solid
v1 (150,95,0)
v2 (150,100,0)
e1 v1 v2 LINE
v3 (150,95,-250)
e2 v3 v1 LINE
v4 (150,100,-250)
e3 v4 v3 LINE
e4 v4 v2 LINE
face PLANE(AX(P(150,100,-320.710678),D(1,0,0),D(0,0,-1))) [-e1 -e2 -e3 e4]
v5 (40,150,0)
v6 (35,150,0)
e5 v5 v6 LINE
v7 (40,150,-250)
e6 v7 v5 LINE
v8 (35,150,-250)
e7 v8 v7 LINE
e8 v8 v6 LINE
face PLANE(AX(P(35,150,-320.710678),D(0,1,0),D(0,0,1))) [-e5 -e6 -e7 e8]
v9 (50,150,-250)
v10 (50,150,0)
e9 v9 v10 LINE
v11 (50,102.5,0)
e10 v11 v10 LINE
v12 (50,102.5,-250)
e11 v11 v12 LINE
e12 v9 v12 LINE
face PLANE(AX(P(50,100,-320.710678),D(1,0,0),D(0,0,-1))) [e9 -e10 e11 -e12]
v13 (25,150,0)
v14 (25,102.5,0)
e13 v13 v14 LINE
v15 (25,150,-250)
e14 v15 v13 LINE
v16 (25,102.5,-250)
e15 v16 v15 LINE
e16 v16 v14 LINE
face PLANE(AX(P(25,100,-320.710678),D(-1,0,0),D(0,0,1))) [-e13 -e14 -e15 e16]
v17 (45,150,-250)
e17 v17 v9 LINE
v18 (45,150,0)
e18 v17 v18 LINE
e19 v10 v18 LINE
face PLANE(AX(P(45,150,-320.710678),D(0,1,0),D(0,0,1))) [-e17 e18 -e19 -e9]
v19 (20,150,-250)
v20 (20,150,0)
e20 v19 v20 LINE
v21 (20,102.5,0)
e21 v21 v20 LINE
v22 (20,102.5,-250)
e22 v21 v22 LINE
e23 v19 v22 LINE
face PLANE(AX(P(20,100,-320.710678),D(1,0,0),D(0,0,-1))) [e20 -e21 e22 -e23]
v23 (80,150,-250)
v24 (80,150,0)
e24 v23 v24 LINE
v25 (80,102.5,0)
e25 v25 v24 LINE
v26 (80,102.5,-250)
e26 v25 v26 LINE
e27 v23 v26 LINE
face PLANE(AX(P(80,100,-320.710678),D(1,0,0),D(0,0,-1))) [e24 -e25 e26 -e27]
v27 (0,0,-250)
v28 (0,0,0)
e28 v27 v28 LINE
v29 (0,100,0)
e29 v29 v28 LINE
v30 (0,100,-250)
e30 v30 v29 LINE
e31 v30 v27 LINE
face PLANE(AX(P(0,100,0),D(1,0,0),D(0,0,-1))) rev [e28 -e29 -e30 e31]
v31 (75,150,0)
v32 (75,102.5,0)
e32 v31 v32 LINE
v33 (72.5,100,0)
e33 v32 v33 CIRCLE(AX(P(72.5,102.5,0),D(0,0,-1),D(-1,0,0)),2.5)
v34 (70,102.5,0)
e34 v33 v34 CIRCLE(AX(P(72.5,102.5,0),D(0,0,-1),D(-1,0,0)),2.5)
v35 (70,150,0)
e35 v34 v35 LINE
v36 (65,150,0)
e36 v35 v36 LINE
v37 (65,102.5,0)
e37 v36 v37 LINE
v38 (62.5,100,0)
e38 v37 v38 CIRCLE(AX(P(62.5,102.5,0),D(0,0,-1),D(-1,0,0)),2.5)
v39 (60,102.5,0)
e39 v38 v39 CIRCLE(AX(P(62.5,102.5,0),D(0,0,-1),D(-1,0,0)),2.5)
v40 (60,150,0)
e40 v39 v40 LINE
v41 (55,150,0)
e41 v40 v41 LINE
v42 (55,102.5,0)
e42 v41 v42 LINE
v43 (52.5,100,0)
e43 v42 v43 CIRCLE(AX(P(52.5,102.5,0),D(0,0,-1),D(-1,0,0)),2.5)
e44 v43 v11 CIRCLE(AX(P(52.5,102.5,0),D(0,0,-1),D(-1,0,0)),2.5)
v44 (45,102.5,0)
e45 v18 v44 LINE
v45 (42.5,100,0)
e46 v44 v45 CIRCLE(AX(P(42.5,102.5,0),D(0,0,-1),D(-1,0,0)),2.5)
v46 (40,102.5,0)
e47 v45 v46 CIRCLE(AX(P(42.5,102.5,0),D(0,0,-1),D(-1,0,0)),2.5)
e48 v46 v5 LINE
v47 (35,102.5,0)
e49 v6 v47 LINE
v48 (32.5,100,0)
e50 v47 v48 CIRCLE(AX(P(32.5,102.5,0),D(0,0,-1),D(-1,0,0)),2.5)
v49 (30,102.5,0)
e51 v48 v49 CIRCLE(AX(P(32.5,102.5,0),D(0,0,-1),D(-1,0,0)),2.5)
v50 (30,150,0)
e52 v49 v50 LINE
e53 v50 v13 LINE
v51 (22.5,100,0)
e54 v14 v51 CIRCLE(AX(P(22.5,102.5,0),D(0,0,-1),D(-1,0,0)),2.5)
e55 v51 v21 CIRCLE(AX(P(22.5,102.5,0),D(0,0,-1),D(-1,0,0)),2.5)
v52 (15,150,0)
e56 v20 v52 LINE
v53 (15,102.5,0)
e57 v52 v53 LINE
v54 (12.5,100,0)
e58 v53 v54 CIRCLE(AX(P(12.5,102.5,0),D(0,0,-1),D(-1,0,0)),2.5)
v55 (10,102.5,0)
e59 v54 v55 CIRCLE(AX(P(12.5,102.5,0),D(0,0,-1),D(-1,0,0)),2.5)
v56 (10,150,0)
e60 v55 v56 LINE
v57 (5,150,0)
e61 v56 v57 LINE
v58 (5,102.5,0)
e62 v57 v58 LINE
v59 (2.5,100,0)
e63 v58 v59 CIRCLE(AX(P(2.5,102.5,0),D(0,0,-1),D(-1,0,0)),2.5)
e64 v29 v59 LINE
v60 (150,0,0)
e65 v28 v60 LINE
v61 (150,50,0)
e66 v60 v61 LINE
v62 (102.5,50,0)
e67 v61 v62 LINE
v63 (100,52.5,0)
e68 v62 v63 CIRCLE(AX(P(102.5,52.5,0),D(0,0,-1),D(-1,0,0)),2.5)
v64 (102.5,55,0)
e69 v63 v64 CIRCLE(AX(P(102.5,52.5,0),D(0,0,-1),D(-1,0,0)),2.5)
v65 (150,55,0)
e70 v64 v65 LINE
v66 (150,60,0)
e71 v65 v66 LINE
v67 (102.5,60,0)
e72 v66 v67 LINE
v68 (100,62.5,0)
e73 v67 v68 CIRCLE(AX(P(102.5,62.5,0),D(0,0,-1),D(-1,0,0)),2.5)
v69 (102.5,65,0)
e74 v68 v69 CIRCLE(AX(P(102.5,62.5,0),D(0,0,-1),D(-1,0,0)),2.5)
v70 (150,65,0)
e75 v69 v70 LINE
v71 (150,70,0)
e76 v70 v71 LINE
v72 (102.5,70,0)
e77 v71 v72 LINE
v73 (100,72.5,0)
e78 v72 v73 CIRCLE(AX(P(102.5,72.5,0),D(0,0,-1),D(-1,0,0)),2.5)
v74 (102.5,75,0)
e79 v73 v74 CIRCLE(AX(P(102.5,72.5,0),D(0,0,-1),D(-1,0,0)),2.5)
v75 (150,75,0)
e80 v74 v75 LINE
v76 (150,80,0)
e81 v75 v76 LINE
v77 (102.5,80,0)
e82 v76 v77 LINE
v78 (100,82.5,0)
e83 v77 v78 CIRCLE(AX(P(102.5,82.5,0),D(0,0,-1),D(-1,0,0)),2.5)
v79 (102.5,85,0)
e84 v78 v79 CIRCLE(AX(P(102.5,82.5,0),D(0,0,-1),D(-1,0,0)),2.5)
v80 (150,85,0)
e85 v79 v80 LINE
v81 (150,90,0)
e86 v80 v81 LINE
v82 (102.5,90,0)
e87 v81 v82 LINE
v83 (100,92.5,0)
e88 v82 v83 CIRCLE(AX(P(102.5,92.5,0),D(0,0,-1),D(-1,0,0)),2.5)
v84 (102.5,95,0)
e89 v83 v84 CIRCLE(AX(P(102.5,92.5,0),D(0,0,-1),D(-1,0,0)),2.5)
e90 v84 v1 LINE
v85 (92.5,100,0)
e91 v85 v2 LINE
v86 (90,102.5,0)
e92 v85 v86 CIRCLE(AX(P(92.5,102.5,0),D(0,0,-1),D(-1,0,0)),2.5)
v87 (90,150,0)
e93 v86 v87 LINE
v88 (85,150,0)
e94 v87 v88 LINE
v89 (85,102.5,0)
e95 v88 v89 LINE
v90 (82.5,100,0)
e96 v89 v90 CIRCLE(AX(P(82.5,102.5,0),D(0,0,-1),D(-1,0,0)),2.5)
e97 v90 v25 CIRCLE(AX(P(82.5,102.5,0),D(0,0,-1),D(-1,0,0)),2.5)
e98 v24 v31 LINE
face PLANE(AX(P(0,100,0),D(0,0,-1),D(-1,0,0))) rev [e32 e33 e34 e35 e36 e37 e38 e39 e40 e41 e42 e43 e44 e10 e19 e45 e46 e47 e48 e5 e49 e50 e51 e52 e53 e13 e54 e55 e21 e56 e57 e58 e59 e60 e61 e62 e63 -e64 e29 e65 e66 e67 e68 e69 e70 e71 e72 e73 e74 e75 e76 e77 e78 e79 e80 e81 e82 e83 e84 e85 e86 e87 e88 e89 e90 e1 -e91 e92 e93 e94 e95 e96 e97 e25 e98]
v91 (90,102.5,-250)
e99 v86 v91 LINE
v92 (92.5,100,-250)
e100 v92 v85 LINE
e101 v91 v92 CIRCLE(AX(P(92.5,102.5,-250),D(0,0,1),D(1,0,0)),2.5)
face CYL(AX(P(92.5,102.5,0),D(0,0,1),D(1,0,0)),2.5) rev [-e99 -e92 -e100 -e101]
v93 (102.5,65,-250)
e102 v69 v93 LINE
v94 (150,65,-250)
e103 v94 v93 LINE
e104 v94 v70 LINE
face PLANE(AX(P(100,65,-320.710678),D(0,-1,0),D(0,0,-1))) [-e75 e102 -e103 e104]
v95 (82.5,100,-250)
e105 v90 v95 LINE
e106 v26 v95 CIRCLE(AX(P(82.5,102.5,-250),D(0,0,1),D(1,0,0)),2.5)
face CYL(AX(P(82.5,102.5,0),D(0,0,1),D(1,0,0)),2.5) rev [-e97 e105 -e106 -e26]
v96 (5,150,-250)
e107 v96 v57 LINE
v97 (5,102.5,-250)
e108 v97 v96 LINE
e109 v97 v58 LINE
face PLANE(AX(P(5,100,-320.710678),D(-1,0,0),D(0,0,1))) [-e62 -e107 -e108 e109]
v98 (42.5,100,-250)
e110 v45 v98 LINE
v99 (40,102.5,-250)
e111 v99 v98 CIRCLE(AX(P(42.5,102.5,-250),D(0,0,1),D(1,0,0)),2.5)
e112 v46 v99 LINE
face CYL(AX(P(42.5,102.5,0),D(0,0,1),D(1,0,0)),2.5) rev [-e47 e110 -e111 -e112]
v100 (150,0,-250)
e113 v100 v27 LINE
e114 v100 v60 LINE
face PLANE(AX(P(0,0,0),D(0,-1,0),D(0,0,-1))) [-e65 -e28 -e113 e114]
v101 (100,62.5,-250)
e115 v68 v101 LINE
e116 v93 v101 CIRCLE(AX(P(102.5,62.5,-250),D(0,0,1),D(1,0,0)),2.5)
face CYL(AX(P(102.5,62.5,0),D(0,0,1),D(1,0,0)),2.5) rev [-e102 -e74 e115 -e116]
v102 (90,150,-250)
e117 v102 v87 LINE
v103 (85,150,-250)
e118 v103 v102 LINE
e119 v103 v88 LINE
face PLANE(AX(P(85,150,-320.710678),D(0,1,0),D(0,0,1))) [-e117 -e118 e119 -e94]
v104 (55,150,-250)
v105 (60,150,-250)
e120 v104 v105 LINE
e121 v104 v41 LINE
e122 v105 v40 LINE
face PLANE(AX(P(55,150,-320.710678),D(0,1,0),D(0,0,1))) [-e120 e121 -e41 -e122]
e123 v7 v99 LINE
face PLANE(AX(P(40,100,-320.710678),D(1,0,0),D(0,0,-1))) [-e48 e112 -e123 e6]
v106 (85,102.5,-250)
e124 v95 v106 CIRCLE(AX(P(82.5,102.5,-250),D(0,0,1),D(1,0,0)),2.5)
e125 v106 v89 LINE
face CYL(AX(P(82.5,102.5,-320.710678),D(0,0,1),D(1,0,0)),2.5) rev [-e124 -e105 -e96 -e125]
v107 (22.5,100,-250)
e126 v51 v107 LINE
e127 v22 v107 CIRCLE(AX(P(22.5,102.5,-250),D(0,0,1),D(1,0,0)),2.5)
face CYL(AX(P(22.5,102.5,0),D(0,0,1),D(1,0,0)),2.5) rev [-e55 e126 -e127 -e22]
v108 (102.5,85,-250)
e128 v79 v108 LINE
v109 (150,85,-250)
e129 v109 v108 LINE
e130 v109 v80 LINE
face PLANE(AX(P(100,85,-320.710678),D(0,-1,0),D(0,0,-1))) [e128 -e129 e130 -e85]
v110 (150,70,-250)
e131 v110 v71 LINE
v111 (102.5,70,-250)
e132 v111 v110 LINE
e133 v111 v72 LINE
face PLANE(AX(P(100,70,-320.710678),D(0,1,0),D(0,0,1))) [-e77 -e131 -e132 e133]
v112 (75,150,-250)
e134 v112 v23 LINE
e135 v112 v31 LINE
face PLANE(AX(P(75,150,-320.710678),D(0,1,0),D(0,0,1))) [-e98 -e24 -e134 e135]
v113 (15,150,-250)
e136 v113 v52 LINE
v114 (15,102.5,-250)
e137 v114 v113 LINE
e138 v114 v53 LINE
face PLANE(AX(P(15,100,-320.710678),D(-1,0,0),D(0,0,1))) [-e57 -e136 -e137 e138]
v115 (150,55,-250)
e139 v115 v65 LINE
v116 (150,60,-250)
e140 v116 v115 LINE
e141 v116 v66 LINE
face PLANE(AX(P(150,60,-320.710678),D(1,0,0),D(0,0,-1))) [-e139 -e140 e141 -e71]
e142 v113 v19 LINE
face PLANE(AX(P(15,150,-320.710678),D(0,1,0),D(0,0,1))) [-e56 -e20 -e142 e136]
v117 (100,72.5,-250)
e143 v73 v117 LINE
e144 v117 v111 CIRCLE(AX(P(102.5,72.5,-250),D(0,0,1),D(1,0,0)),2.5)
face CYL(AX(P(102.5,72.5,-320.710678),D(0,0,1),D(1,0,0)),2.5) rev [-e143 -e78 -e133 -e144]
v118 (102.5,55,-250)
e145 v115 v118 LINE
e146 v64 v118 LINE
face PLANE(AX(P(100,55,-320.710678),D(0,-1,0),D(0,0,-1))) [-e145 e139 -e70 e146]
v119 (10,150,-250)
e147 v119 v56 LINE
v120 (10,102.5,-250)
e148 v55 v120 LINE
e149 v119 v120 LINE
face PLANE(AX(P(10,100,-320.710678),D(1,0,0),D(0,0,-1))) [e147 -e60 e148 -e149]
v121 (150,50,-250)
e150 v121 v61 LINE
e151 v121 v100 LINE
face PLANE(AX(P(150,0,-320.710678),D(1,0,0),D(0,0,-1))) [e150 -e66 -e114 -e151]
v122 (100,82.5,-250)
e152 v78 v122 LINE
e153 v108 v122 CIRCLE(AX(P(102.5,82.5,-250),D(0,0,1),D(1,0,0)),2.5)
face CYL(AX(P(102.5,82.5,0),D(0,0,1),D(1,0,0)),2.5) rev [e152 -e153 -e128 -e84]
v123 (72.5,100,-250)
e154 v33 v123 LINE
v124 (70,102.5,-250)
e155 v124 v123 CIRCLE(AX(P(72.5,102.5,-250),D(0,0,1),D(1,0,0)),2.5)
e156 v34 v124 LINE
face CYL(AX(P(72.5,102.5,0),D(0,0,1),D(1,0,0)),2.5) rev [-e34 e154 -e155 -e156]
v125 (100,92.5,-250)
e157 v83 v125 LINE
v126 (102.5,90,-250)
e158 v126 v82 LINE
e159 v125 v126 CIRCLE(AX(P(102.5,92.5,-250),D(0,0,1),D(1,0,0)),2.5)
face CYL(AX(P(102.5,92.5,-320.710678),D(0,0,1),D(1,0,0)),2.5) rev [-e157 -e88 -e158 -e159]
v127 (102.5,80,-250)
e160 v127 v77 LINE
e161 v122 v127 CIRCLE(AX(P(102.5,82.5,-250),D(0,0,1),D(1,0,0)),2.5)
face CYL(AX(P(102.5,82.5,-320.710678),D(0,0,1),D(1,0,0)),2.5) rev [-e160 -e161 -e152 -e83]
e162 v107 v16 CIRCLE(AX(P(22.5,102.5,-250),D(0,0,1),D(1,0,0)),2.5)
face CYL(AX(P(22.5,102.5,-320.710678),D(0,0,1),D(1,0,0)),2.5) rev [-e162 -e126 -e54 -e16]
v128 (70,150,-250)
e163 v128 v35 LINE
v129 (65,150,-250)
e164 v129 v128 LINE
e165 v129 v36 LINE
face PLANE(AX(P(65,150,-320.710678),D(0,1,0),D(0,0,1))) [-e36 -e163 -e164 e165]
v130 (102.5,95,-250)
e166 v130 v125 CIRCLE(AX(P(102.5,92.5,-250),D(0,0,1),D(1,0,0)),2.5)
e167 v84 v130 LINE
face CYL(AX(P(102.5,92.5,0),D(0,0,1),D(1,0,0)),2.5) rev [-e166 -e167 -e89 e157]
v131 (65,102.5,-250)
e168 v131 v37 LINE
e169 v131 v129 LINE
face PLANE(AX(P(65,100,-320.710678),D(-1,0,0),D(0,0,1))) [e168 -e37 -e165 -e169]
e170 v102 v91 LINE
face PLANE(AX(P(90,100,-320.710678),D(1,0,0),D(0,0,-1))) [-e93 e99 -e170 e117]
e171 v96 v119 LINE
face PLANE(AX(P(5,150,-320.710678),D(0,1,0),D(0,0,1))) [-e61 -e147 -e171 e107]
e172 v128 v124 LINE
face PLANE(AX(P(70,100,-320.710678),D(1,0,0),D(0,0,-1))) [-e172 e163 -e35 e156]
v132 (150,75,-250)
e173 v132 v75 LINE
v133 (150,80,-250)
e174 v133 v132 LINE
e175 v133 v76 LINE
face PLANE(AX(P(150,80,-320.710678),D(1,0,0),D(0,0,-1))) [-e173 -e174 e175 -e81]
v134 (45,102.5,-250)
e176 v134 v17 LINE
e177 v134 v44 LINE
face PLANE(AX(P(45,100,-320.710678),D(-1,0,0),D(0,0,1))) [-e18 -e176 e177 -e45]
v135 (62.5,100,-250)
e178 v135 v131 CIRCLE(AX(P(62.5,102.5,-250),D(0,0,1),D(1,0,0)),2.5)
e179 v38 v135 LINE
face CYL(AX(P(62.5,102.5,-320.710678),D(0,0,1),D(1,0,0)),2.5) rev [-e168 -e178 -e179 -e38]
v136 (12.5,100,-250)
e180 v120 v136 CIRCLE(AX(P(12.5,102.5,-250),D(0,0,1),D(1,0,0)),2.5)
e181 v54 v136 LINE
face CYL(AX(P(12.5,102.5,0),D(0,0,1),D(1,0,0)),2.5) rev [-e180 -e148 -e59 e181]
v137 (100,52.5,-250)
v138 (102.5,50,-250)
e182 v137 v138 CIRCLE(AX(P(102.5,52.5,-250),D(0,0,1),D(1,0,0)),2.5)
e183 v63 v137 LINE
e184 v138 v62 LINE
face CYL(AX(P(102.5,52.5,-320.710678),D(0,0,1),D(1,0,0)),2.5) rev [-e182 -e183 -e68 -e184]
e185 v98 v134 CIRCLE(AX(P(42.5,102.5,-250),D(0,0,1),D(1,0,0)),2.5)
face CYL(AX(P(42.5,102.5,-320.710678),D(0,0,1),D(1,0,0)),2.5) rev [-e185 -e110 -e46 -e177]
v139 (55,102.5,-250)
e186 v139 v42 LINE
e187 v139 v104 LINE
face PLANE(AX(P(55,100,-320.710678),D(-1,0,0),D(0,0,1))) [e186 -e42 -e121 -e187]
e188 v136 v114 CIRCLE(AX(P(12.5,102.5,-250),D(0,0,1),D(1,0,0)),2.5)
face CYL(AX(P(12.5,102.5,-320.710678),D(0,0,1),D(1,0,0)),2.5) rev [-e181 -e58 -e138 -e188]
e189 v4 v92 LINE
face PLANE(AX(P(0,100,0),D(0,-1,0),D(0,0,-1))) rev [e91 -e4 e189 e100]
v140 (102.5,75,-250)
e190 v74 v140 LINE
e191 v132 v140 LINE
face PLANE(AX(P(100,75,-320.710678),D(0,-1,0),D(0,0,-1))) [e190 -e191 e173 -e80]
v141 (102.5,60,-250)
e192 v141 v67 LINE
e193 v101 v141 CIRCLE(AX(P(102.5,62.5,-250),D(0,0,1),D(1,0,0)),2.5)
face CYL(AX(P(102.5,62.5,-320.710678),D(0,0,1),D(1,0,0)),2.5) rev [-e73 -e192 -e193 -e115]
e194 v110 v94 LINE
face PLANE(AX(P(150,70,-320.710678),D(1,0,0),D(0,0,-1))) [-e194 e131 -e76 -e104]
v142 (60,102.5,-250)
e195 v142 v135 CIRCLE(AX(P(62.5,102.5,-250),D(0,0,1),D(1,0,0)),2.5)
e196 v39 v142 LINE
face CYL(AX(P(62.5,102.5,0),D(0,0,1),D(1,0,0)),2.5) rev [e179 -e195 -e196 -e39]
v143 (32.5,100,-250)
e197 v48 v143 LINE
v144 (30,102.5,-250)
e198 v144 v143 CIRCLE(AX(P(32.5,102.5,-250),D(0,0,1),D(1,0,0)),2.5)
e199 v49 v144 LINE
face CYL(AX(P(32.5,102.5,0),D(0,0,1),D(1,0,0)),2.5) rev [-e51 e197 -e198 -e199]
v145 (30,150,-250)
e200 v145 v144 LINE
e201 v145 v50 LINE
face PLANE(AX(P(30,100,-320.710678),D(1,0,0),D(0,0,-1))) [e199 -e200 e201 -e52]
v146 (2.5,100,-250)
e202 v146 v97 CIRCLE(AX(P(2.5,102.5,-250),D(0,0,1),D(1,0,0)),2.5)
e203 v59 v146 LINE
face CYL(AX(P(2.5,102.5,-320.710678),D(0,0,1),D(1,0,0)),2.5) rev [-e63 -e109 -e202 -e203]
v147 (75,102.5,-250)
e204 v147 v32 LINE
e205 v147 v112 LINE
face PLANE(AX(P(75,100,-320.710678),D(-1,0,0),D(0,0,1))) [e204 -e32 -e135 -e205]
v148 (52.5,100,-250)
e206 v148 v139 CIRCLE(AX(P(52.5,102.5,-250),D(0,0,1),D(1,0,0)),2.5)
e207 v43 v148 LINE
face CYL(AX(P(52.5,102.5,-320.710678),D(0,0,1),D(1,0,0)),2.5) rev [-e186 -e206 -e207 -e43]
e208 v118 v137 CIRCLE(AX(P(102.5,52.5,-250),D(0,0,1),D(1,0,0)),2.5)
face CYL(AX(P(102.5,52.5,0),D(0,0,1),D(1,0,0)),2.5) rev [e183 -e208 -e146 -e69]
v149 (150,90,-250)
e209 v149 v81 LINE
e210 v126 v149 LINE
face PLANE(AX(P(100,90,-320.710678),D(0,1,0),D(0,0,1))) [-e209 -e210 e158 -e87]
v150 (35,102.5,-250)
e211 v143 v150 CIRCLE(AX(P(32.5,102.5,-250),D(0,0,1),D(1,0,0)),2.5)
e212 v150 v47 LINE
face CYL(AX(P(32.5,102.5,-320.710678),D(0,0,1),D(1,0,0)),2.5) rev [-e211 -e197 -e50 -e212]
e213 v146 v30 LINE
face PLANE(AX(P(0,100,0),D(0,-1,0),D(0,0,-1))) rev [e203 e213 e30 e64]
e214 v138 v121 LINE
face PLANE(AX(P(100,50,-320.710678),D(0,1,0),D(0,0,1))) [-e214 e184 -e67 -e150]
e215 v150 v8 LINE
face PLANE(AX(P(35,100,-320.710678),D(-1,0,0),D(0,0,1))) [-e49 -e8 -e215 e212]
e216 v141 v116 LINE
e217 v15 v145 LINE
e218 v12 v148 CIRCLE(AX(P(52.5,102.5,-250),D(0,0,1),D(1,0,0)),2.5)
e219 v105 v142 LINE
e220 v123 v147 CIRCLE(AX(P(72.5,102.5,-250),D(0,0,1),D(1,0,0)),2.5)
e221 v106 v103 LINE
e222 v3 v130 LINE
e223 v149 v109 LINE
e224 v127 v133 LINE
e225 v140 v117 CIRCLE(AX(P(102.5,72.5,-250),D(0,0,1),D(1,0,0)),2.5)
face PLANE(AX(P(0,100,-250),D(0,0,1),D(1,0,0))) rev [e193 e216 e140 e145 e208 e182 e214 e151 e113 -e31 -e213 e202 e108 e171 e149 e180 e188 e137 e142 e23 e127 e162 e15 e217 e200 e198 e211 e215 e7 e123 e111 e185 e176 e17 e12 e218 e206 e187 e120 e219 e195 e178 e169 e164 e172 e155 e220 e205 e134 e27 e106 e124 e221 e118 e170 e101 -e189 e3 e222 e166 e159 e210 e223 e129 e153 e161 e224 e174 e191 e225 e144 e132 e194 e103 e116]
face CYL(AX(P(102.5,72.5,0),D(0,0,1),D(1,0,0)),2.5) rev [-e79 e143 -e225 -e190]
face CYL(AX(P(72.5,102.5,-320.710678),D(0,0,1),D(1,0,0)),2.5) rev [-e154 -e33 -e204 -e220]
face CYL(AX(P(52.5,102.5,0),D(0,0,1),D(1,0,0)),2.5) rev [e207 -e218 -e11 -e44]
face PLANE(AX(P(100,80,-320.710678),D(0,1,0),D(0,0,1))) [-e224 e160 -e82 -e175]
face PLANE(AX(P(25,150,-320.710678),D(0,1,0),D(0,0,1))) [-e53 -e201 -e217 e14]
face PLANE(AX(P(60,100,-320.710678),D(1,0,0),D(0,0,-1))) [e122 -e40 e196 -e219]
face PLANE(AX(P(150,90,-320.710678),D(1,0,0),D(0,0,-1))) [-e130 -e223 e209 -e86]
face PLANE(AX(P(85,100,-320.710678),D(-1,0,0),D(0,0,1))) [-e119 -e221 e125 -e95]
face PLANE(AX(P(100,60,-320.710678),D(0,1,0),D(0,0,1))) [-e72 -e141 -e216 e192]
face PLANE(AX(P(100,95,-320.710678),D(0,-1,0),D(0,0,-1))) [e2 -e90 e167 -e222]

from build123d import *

# Parameters (mm, degrees)
SKETCH1_W           = 100
SKETCH1_H           = 250
BOSS_EXTRUDE1_DEPTH = 100
SKETCH2_W           = 50
SKETCH2_H           = 5
SKETCH2_W_2         = 5
SKETCH2_H_2         = 50
BOSS_EXTRUDE2_DEPTH = 250
FILLET3_R           = 2.5
FILLET4_R           = 2.5


with BuildPart() as part:
    # Sketch1 → Boss-Extrude1 (new body)
    with BuildSketch(Plane(origin=(0, 0, 0), x_dir=(1, 0, 0), z_dir=(0, 1, 0))):
        with Locations((50, 125)):
            Rectangle(SKETCH1_W, SKETCH1_H)
    extrude(amount=BOSS_EXTRUDE1_DEPTH)

    # Sketch2 → Boss-Extrude2 (add)
    with BuildSketch(Plane.XY):
        with Locations((125, 87.5)):
            Rectangle(SKETCH2_W, SKETCH2_H)
        with Locations((125, 97.5)):
            Rectangle(SKETCH2_W, SKETCH2_H)
        with Locations((125, 77.5)):
            Rectangle(SKETCH2_W, SKETCH2_H)
        with Locations((125, 67.5)):
            Rectangle(SKETCH2_W, SKETCH2_H)
        with Locations((17.5, 125)):
            Rectangle(SKETCH2_W_2, SKETCH2_H_2)
        with Locations((7.5, 125)):
            Rectangle(SKETCH2_W_2, SKETCH2_H_2)
        with Locations((27.5, 125)):
            Rectangle(SKETCH2_W_2, SKETCH2_H_2)
        with Locations((37.5, 125)):
            Rectangle(SKETCH2_W_2, SKETCH2_H_2)
        with Locations((47.5, 125)):
            Rectangle(SKETCH2_W_2, SKETCH2_H_2)
        with Locations((57.5, 125)):
            Rectangle(SKETCH2_W_2, SKETCH2_H_2)
        with Locations((67.5, 125)):
            Rectangle(SKETCH2_W_2, SKETCH2_H_2)
        with Locations((77.5, 125)):
            Rectangle(SKETCH2_W_2, SKETCH2_H_2)
        with Locations((87.5, 125)):
            Rectangle(SKETCH2_W_2, SKETCH2_H_2)
        with Locations((125, 25)):
            Rectangle(SKETCH2_W, SKETCH2_H_2)
        with Locations((125, 57.5)):
            Rectangle(SKETCH2_W, SKETCH2_H)
    extrude(amount=-BOSS_EXTRUDE2_DEPTH)

    # Fillet3
    fillet3_edges = [part.edges().sort_by_distance(p)[0] for p in [
        (80, 100, -125),
        (75, 100, -125),
        (90, 100, -125),
        (85, 100, -125),
        (5, 100, -125),
        (10, 100, -125),
        (20, 100, -125),
        (15, 100, -125),
        (30, 100, -125),
        (25, 100, -125),
        (40, 100, -125),
        (35, 100, -125),
        (50, 100, -125),
        (45, 100, -125),
        (60, 100, -125),
        (55, 100, -125),
        (70, 100, -125),
        (65, 100, -125),
    ]]
    fillet(fillet3_edges, radius=FILLET3_R - 0.0001)  # a hair under: the kernel refuses the full size

    # Fillet4
    fillet4_edges = [part.edges().sort_by_distance(p)[0] for p in [
        (100, 55, -125),
        (100, 65, -125),
        (100, 75, -125),
        (100, 85, -125),
        (100, 95, -125),
        (100, 90, -125),
        (100, 80, -125),
        (100, 70, -125),
        (100, 60, -125),
        (100, 50, -125),
    ]]
    fillet(fillet4_edges, radius=FILLET4_R - 0.0001)  # a hair under: the kernel refuses the full size


solid = part.part
